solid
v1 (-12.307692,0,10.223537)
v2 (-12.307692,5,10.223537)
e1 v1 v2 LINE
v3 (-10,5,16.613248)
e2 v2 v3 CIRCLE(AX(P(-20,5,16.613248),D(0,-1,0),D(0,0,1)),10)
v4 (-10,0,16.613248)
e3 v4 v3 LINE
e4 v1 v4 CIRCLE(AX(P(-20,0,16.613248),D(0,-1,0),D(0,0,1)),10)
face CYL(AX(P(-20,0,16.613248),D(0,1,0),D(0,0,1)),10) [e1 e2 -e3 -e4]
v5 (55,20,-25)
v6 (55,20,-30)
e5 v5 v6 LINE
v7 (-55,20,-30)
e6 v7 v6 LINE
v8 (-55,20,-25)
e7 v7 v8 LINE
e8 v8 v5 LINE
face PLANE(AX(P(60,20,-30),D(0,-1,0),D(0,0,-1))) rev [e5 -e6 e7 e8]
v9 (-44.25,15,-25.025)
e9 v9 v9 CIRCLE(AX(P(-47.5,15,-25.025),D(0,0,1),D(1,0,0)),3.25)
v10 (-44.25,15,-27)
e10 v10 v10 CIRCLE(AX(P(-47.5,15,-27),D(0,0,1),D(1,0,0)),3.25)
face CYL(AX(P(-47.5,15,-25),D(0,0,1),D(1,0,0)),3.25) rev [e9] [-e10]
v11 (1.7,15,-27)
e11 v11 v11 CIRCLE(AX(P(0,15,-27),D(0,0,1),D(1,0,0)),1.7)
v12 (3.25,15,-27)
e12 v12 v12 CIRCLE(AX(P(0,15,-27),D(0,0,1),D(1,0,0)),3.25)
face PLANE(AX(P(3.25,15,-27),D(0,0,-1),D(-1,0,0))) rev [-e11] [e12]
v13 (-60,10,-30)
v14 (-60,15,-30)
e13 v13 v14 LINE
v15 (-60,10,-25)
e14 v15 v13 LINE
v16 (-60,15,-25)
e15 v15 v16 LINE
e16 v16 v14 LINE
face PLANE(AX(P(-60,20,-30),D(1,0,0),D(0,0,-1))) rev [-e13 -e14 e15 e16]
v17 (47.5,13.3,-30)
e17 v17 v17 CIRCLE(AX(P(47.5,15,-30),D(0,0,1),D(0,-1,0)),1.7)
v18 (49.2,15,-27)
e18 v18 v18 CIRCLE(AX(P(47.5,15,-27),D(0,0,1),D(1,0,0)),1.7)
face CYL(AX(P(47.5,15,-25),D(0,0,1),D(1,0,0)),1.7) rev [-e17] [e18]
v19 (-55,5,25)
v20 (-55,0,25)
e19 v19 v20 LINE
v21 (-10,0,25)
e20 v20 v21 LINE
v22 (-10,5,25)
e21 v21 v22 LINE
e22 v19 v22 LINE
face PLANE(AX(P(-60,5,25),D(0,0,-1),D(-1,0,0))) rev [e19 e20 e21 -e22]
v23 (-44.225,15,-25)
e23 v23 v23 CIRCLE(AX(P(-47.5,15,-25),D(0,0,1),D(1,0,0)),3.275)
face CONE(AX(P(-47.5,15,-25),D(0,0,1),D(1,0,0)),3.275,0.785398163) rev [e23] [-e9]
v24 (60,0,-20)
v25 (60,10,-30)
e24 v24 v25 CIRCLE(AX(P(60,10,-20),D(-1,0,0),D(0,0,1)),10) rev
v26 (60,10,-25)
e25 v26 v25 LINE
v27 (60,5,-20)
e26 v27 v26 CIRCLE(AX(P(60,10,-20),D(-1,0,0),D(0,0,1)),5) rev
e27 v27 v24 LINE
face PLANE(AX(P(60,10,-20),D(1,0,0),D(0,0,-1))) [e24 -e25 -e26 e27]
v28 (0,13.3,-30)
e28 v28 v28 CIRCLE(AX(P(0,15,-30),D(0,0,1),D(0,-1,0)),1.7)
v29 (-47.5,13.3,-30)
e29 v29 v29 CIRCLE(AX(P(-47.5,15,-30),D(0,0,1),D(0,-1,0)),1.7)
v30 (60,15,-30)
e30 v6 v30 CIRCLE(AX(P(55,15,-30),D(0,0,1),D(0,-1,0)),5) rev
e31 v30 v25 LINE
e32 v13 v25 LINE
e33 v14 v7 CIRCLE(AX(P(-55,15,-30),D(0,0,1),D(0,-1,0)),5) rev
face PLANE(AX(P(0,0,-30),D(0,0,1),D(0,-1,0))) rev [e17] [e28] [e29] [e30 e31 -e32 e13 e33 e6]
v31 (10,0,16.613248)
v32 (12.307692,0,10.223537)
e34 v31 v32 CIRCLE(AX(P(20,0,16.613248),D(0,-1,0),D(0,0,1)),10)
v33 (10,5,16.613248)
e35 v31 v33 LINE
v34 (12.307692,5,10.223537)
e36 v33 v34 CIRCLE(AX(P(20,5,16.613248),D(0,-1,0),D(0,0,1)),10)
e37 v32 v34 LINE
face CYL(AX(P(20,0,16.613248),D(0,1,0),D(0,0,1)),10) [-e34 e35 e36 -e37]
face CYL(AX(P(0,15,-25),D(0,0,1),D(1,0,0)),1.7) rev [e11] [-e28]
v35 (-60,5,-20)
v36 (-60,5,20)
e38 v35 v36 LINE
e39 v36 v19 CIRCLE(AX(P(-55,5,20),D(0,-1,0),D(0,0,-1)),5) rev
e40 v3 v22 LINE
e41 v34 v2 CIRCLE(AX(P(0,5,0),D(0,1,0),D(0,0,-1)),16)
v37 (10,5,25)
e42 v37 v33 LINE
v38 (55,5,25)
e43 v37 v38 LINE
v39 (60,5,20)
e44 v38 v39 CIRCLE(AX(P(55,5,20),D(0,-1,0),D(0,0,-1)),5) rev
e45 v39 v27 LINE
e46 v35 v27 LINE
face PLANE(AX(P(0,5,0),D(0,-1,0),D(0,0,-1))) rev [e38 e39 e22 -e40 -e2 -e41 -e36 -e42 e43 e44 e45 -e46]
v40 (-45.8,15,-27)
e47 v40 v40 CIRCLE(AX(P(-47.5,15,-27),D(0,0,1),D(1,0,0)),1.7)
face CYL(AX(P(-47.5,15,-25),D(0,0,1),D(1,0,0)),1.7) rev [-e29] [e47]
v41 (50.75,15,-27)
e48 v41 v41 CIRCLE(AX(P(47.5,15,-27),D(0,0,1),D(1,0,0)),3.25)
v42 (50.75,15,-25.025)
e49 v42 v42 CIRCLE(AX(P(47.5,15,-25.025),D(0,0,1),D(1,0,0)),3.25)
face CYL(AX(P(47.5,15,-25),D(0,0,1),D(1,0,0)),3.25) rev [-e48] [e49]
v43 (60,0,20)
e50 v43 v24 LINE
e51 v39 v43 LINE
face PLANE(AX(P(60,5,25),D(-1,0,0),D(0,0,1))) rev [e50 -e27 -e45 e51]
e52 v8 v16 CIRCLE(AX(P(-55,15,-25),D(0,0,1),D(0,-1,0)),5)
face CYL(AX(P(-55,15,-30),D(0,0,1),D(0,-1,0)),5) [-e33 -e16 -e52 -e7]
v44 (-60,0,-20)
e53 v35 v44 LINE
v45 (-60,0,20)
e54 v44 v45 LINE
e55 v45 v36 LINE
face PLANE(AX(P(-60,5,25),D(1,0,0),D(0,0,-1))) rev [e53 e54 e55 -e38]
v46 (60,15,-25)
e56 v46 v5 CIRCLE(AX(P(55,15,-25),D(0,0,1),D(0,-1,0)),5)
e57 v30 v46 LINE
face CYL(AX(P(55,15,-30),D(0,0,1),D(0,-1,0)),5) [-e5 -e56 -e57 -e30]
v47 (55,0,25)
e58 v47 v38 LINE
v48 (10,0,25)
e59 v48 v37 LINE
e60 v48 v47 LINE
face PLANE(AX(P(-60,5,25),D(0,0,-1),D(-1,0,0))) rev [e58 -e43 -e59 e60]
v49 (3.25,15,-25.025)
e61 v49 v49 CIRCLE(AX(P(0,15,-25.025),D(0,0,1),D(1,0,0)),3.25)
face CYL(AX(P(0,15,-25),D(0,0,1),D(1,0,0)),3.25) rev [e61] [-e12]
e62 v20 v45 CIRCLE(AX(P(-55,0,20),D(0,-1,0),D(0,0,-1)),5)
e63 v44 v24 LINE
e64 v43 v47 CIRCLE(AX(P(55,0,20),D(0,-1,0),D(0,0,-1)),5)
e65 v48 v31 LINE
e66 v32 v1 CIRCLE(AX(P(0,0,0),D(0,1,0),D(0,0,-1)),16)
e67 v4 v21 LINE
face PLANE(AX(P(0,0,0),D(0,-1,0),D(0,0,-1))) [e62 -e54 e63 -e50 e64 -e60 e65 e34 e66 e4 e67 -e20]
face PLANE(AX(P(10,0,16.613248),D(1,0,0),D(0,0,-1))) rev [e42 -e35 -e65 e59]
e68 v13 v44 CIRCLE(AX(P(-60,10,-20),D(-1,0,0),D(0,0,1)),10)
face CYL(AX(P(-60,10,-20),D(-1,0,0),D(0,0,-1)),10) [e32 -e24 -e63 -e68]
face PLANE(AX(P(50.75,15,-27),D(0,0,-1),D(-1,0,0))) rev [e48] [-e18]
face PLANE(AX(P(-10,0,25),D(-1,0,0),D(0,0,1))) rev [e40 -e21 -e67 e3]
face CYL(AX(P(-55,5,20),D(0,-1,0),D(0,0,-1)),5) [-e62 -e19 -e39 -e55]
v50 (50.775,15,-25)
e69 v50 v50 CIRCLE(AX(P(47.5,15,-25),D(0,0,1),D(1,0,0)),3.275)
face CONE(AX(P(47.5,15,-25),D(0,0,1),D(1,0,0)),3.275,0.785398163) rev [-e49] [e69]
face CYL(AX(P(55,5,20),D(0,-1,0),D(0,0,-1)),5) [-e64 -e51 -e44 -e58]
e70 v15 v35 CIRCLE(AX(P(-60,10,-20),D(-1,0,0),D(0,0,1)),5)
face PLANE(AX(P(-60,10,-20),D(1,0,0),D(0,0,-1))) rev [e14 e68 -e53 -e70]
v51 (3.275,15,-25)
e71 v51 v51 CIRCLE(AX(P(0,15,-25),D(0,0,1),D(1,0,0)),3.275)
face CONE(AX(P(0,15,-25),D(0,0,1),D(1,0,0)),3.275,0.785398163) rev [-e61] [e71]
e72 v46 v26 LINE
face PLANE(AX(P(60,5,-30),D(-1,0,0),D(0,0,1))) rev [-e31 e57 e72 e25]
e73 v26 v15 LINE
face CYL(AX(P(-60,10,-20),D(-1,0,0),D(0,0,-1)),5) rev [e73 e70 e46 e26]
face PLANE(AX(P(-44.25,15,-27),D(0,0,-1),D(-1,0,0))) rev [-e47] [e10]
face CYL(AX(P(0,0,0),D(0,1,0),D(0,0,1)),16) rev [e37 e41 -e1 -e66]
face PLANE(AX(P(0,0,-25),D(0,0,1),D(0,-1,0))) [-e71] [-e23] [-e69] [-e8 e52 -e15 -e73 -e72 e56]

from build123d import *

# Parameters (mm, degrees)
SKETCH1_W                                  = 120
SKETCH1_H                                  = 50
BASE_FLANGE1_DEPTH                         = 5
EDGE_FLANGE1_STRIP_W                       = 30
EDGE_FLANGE1_STRIP_H                       = 5
EDGE_FLANGE1_STRIP_CUT_DEPTH               = 120
EDGE_FLANGE1_DEPTH                         = 120
CUT_EXTRUDE1_DEPTH                         = 10
CBORE_FOR_M3_CHEESE_HEAD_SCREW1_AT_2_COUNT = 2
CBORE_FOR_M3_CHEESE_HEAD_SCREW1_AT_2_PITCH = 47.5
CBORE_FOR_M3_CHEESE_HEAD_SCREW1_AT_3_COUNT = 2
CBORE_FOR_M3_CHEESE_HEAD_SCREW1_AT_3_PITCH = 95
BREAK_CORNER1_START                        = -30
BREAK_CORNER1_DEPTH                        = 5
BREAK_CORNER1_2_DEPTH                      = 5


# Read off the part's stored shape, not the designer's step: Break-Corner1
# Sheet-metal steps are written as plain solids
with BuildPart() as part:
    # Sketch1 → Base-Flange1 (new body)
    with BuildSketch(Plane(origin=(0, 0, 0), x_dir=(1, 0, 0), z_dir=(0, 1, 0))):
        Rectangle(SKETCH1_W, SKETCH1_H)
    extrude(amount=BASE_FLANGE1_DEPTH)

    # Edge-Flange1 strip (across the edge) → Edge-Flange1 strip cut (cut)
    with BuildSketch(Plane(origin=(60, 5, -25), x_dir=(0, 0, 1), z_dir=(-1, 0, 0))):
        with Locations((-10, -2.5)):
            Rectangle(EDGE_FLANGE1_STRIP_W, EDGE_FLANGE1_STRIP_H)
    extrude(amount=EDGE_FLANGE1_STRIP_CUT_DEPTH, mode=Mode.SUBTRACT)

    # Edge-Flange1 section (across the edge) → Edge-Flange1 (add)
    with BuildSketch(Plane(origin=(60, 5, -25), x_dir=(0, 0, 1), z_dir=(-1, 0, 0))):
        with BuildLine():
            Line((-5, 5), (-5, 15))
            Line((-5, 15), (0, 15))
            Line((0, 15), (0, 5))
            ThreePointArc((0, 5), (1.464466094, 1.464466094), (5, 0))
            Line((5, 0), (5, -5))
            ThreePointArc((5, -5), (-2.071067812, -2.071067812), (-5, 5))
        make_face()
    extrude(amount=EDGE_FLANGE1_DEPTH)

    # Sketch9 → Cut-Extrude1 (cut)
    with BuildSketch(Plane(origin=(0, 5, 0), x_dir=(1, 0, 0), z_dir=(0, 1, 0))):
        with BuildLine():
            Line((-10, -25), (-10, -16.613247726))
            ThreePointArc((-10, -16.613247726), (-10.594600569, -13.216416623), (-12.307692308, -10.223537062))
            ThreePointArc((-12.307692308, -10.223537062), (0, 16), (12.307692308, -10.223537062))
            ThreePointArc((12.307692308, -10.223537062), (10.594600569, -13.216416623), (10, -16.613247726))
            Line((10, -16.613247726), (10, -25))
            Line((10, -25), (-10, -25))
        make_face()
    extrude(amount=-CUT_EXTRUDE1_DEPTH, mode=Mode.SUBTRACT)

    # Sketch14 → CBORE for M3 Cheese Head Screw1 (revolve, cut)
    with BuildSketch(Plane(origin=(-47.5, 15, -25), x_dir=(0, -1, 0), z_dir=(1, 0, 0))):
        Polygon((0, 0), (0, 5), (1.7, 5), (1.7, 2), (3.25, 2), (3.25, 0.025), (3.275, 0), align=None)
    cbore_for_m3_cheese_head_screw1 = revolve(axis=Axis((-47.5, 15, -18.65), (0, 0, -1)), mode=Mode.SUBTRACT)

    # CBORE for M3 Cheese Head Screw1 at 2: CBORE for M3 Cheese Head Screw1 ×2
    with Locations(*[(i * CBORE_FOR_M3_CHEESE_HEAD_SCREW1_AT_2_PITCH, 0, 0) for i in range(1, CBORE_FOR_M3_CHEESE_HEAD_SCREW1_AT_2_COUNT)]):
        add(cbore_for_m3_cheese_head_screw1, mode=Mode.SUBTRACT)

    # CBORE for M3 Cheese Head Screw1 at 3: CBORE for M3 Cheese Head Screw1 ×2
    with Locations(*[(i * CBORE_FOR_M3_CHEESE_HEAD_SCREW1_AT_3_PITCH, 0, 0) for i in range(1, CBORE_FOR_M3_CHEESE_HEAD_SCREW1_AT_3_COUNT)]):
        add(cbore_for_m3_cheese_head_screw1, mode=Mode.SUBTRACT)

    # Break-Corner1 outline → Break-Corner1 (cut)
    with BuildSketch(Plane.XY.offset(BREAK_CORNER1_START)):
        with BuildLine():
            Line((60, 20), (55, 20))
            ThreePointArc((55, 20), (58.535533906, 18.535533906), (60, 15))
            Line((60, 15), (60, 20))
        make_face()
        with BuildLine():
            ThreePointArc((-60, 15), (-58.535533906, 18.535533906), (-55, 20))
            Line((-55, 20), (-60, 20))
            Line((-60, 20), (-60, 15))
        make_face()
    extrude(amount=BREAK_CORNER1_DEPTH, mode=Mode.SUBTRACT)

    # Break-Corner1 2 outline → Break-Corner1 2 (cut)
    with BuildSketch(Plane(origin=(0, 0, 0), x_dir=(1, 0, 0), z_dir=(0, 1, 0))):
        with BuildLine():
            Line((60, -25), (60, -20))
            ThreePointArc((60, -20), (58.535533906, -23.535533906), (55, -25))
            Line((55, -25), (60, -25))
        make_face()
        with BuildLine():
            Line((-60, -25), (-55, -25))
            ThreePointArc((-55, -25), (-58.535533906, -23.535533906), (-60, -20))
            Line((-60, -20), (-60, -25))
        make_face()
    extrude(amount=BREAK_CORNER1_2_DEPTH, mode=Mode.SUBTRACT)


solid = part.part
